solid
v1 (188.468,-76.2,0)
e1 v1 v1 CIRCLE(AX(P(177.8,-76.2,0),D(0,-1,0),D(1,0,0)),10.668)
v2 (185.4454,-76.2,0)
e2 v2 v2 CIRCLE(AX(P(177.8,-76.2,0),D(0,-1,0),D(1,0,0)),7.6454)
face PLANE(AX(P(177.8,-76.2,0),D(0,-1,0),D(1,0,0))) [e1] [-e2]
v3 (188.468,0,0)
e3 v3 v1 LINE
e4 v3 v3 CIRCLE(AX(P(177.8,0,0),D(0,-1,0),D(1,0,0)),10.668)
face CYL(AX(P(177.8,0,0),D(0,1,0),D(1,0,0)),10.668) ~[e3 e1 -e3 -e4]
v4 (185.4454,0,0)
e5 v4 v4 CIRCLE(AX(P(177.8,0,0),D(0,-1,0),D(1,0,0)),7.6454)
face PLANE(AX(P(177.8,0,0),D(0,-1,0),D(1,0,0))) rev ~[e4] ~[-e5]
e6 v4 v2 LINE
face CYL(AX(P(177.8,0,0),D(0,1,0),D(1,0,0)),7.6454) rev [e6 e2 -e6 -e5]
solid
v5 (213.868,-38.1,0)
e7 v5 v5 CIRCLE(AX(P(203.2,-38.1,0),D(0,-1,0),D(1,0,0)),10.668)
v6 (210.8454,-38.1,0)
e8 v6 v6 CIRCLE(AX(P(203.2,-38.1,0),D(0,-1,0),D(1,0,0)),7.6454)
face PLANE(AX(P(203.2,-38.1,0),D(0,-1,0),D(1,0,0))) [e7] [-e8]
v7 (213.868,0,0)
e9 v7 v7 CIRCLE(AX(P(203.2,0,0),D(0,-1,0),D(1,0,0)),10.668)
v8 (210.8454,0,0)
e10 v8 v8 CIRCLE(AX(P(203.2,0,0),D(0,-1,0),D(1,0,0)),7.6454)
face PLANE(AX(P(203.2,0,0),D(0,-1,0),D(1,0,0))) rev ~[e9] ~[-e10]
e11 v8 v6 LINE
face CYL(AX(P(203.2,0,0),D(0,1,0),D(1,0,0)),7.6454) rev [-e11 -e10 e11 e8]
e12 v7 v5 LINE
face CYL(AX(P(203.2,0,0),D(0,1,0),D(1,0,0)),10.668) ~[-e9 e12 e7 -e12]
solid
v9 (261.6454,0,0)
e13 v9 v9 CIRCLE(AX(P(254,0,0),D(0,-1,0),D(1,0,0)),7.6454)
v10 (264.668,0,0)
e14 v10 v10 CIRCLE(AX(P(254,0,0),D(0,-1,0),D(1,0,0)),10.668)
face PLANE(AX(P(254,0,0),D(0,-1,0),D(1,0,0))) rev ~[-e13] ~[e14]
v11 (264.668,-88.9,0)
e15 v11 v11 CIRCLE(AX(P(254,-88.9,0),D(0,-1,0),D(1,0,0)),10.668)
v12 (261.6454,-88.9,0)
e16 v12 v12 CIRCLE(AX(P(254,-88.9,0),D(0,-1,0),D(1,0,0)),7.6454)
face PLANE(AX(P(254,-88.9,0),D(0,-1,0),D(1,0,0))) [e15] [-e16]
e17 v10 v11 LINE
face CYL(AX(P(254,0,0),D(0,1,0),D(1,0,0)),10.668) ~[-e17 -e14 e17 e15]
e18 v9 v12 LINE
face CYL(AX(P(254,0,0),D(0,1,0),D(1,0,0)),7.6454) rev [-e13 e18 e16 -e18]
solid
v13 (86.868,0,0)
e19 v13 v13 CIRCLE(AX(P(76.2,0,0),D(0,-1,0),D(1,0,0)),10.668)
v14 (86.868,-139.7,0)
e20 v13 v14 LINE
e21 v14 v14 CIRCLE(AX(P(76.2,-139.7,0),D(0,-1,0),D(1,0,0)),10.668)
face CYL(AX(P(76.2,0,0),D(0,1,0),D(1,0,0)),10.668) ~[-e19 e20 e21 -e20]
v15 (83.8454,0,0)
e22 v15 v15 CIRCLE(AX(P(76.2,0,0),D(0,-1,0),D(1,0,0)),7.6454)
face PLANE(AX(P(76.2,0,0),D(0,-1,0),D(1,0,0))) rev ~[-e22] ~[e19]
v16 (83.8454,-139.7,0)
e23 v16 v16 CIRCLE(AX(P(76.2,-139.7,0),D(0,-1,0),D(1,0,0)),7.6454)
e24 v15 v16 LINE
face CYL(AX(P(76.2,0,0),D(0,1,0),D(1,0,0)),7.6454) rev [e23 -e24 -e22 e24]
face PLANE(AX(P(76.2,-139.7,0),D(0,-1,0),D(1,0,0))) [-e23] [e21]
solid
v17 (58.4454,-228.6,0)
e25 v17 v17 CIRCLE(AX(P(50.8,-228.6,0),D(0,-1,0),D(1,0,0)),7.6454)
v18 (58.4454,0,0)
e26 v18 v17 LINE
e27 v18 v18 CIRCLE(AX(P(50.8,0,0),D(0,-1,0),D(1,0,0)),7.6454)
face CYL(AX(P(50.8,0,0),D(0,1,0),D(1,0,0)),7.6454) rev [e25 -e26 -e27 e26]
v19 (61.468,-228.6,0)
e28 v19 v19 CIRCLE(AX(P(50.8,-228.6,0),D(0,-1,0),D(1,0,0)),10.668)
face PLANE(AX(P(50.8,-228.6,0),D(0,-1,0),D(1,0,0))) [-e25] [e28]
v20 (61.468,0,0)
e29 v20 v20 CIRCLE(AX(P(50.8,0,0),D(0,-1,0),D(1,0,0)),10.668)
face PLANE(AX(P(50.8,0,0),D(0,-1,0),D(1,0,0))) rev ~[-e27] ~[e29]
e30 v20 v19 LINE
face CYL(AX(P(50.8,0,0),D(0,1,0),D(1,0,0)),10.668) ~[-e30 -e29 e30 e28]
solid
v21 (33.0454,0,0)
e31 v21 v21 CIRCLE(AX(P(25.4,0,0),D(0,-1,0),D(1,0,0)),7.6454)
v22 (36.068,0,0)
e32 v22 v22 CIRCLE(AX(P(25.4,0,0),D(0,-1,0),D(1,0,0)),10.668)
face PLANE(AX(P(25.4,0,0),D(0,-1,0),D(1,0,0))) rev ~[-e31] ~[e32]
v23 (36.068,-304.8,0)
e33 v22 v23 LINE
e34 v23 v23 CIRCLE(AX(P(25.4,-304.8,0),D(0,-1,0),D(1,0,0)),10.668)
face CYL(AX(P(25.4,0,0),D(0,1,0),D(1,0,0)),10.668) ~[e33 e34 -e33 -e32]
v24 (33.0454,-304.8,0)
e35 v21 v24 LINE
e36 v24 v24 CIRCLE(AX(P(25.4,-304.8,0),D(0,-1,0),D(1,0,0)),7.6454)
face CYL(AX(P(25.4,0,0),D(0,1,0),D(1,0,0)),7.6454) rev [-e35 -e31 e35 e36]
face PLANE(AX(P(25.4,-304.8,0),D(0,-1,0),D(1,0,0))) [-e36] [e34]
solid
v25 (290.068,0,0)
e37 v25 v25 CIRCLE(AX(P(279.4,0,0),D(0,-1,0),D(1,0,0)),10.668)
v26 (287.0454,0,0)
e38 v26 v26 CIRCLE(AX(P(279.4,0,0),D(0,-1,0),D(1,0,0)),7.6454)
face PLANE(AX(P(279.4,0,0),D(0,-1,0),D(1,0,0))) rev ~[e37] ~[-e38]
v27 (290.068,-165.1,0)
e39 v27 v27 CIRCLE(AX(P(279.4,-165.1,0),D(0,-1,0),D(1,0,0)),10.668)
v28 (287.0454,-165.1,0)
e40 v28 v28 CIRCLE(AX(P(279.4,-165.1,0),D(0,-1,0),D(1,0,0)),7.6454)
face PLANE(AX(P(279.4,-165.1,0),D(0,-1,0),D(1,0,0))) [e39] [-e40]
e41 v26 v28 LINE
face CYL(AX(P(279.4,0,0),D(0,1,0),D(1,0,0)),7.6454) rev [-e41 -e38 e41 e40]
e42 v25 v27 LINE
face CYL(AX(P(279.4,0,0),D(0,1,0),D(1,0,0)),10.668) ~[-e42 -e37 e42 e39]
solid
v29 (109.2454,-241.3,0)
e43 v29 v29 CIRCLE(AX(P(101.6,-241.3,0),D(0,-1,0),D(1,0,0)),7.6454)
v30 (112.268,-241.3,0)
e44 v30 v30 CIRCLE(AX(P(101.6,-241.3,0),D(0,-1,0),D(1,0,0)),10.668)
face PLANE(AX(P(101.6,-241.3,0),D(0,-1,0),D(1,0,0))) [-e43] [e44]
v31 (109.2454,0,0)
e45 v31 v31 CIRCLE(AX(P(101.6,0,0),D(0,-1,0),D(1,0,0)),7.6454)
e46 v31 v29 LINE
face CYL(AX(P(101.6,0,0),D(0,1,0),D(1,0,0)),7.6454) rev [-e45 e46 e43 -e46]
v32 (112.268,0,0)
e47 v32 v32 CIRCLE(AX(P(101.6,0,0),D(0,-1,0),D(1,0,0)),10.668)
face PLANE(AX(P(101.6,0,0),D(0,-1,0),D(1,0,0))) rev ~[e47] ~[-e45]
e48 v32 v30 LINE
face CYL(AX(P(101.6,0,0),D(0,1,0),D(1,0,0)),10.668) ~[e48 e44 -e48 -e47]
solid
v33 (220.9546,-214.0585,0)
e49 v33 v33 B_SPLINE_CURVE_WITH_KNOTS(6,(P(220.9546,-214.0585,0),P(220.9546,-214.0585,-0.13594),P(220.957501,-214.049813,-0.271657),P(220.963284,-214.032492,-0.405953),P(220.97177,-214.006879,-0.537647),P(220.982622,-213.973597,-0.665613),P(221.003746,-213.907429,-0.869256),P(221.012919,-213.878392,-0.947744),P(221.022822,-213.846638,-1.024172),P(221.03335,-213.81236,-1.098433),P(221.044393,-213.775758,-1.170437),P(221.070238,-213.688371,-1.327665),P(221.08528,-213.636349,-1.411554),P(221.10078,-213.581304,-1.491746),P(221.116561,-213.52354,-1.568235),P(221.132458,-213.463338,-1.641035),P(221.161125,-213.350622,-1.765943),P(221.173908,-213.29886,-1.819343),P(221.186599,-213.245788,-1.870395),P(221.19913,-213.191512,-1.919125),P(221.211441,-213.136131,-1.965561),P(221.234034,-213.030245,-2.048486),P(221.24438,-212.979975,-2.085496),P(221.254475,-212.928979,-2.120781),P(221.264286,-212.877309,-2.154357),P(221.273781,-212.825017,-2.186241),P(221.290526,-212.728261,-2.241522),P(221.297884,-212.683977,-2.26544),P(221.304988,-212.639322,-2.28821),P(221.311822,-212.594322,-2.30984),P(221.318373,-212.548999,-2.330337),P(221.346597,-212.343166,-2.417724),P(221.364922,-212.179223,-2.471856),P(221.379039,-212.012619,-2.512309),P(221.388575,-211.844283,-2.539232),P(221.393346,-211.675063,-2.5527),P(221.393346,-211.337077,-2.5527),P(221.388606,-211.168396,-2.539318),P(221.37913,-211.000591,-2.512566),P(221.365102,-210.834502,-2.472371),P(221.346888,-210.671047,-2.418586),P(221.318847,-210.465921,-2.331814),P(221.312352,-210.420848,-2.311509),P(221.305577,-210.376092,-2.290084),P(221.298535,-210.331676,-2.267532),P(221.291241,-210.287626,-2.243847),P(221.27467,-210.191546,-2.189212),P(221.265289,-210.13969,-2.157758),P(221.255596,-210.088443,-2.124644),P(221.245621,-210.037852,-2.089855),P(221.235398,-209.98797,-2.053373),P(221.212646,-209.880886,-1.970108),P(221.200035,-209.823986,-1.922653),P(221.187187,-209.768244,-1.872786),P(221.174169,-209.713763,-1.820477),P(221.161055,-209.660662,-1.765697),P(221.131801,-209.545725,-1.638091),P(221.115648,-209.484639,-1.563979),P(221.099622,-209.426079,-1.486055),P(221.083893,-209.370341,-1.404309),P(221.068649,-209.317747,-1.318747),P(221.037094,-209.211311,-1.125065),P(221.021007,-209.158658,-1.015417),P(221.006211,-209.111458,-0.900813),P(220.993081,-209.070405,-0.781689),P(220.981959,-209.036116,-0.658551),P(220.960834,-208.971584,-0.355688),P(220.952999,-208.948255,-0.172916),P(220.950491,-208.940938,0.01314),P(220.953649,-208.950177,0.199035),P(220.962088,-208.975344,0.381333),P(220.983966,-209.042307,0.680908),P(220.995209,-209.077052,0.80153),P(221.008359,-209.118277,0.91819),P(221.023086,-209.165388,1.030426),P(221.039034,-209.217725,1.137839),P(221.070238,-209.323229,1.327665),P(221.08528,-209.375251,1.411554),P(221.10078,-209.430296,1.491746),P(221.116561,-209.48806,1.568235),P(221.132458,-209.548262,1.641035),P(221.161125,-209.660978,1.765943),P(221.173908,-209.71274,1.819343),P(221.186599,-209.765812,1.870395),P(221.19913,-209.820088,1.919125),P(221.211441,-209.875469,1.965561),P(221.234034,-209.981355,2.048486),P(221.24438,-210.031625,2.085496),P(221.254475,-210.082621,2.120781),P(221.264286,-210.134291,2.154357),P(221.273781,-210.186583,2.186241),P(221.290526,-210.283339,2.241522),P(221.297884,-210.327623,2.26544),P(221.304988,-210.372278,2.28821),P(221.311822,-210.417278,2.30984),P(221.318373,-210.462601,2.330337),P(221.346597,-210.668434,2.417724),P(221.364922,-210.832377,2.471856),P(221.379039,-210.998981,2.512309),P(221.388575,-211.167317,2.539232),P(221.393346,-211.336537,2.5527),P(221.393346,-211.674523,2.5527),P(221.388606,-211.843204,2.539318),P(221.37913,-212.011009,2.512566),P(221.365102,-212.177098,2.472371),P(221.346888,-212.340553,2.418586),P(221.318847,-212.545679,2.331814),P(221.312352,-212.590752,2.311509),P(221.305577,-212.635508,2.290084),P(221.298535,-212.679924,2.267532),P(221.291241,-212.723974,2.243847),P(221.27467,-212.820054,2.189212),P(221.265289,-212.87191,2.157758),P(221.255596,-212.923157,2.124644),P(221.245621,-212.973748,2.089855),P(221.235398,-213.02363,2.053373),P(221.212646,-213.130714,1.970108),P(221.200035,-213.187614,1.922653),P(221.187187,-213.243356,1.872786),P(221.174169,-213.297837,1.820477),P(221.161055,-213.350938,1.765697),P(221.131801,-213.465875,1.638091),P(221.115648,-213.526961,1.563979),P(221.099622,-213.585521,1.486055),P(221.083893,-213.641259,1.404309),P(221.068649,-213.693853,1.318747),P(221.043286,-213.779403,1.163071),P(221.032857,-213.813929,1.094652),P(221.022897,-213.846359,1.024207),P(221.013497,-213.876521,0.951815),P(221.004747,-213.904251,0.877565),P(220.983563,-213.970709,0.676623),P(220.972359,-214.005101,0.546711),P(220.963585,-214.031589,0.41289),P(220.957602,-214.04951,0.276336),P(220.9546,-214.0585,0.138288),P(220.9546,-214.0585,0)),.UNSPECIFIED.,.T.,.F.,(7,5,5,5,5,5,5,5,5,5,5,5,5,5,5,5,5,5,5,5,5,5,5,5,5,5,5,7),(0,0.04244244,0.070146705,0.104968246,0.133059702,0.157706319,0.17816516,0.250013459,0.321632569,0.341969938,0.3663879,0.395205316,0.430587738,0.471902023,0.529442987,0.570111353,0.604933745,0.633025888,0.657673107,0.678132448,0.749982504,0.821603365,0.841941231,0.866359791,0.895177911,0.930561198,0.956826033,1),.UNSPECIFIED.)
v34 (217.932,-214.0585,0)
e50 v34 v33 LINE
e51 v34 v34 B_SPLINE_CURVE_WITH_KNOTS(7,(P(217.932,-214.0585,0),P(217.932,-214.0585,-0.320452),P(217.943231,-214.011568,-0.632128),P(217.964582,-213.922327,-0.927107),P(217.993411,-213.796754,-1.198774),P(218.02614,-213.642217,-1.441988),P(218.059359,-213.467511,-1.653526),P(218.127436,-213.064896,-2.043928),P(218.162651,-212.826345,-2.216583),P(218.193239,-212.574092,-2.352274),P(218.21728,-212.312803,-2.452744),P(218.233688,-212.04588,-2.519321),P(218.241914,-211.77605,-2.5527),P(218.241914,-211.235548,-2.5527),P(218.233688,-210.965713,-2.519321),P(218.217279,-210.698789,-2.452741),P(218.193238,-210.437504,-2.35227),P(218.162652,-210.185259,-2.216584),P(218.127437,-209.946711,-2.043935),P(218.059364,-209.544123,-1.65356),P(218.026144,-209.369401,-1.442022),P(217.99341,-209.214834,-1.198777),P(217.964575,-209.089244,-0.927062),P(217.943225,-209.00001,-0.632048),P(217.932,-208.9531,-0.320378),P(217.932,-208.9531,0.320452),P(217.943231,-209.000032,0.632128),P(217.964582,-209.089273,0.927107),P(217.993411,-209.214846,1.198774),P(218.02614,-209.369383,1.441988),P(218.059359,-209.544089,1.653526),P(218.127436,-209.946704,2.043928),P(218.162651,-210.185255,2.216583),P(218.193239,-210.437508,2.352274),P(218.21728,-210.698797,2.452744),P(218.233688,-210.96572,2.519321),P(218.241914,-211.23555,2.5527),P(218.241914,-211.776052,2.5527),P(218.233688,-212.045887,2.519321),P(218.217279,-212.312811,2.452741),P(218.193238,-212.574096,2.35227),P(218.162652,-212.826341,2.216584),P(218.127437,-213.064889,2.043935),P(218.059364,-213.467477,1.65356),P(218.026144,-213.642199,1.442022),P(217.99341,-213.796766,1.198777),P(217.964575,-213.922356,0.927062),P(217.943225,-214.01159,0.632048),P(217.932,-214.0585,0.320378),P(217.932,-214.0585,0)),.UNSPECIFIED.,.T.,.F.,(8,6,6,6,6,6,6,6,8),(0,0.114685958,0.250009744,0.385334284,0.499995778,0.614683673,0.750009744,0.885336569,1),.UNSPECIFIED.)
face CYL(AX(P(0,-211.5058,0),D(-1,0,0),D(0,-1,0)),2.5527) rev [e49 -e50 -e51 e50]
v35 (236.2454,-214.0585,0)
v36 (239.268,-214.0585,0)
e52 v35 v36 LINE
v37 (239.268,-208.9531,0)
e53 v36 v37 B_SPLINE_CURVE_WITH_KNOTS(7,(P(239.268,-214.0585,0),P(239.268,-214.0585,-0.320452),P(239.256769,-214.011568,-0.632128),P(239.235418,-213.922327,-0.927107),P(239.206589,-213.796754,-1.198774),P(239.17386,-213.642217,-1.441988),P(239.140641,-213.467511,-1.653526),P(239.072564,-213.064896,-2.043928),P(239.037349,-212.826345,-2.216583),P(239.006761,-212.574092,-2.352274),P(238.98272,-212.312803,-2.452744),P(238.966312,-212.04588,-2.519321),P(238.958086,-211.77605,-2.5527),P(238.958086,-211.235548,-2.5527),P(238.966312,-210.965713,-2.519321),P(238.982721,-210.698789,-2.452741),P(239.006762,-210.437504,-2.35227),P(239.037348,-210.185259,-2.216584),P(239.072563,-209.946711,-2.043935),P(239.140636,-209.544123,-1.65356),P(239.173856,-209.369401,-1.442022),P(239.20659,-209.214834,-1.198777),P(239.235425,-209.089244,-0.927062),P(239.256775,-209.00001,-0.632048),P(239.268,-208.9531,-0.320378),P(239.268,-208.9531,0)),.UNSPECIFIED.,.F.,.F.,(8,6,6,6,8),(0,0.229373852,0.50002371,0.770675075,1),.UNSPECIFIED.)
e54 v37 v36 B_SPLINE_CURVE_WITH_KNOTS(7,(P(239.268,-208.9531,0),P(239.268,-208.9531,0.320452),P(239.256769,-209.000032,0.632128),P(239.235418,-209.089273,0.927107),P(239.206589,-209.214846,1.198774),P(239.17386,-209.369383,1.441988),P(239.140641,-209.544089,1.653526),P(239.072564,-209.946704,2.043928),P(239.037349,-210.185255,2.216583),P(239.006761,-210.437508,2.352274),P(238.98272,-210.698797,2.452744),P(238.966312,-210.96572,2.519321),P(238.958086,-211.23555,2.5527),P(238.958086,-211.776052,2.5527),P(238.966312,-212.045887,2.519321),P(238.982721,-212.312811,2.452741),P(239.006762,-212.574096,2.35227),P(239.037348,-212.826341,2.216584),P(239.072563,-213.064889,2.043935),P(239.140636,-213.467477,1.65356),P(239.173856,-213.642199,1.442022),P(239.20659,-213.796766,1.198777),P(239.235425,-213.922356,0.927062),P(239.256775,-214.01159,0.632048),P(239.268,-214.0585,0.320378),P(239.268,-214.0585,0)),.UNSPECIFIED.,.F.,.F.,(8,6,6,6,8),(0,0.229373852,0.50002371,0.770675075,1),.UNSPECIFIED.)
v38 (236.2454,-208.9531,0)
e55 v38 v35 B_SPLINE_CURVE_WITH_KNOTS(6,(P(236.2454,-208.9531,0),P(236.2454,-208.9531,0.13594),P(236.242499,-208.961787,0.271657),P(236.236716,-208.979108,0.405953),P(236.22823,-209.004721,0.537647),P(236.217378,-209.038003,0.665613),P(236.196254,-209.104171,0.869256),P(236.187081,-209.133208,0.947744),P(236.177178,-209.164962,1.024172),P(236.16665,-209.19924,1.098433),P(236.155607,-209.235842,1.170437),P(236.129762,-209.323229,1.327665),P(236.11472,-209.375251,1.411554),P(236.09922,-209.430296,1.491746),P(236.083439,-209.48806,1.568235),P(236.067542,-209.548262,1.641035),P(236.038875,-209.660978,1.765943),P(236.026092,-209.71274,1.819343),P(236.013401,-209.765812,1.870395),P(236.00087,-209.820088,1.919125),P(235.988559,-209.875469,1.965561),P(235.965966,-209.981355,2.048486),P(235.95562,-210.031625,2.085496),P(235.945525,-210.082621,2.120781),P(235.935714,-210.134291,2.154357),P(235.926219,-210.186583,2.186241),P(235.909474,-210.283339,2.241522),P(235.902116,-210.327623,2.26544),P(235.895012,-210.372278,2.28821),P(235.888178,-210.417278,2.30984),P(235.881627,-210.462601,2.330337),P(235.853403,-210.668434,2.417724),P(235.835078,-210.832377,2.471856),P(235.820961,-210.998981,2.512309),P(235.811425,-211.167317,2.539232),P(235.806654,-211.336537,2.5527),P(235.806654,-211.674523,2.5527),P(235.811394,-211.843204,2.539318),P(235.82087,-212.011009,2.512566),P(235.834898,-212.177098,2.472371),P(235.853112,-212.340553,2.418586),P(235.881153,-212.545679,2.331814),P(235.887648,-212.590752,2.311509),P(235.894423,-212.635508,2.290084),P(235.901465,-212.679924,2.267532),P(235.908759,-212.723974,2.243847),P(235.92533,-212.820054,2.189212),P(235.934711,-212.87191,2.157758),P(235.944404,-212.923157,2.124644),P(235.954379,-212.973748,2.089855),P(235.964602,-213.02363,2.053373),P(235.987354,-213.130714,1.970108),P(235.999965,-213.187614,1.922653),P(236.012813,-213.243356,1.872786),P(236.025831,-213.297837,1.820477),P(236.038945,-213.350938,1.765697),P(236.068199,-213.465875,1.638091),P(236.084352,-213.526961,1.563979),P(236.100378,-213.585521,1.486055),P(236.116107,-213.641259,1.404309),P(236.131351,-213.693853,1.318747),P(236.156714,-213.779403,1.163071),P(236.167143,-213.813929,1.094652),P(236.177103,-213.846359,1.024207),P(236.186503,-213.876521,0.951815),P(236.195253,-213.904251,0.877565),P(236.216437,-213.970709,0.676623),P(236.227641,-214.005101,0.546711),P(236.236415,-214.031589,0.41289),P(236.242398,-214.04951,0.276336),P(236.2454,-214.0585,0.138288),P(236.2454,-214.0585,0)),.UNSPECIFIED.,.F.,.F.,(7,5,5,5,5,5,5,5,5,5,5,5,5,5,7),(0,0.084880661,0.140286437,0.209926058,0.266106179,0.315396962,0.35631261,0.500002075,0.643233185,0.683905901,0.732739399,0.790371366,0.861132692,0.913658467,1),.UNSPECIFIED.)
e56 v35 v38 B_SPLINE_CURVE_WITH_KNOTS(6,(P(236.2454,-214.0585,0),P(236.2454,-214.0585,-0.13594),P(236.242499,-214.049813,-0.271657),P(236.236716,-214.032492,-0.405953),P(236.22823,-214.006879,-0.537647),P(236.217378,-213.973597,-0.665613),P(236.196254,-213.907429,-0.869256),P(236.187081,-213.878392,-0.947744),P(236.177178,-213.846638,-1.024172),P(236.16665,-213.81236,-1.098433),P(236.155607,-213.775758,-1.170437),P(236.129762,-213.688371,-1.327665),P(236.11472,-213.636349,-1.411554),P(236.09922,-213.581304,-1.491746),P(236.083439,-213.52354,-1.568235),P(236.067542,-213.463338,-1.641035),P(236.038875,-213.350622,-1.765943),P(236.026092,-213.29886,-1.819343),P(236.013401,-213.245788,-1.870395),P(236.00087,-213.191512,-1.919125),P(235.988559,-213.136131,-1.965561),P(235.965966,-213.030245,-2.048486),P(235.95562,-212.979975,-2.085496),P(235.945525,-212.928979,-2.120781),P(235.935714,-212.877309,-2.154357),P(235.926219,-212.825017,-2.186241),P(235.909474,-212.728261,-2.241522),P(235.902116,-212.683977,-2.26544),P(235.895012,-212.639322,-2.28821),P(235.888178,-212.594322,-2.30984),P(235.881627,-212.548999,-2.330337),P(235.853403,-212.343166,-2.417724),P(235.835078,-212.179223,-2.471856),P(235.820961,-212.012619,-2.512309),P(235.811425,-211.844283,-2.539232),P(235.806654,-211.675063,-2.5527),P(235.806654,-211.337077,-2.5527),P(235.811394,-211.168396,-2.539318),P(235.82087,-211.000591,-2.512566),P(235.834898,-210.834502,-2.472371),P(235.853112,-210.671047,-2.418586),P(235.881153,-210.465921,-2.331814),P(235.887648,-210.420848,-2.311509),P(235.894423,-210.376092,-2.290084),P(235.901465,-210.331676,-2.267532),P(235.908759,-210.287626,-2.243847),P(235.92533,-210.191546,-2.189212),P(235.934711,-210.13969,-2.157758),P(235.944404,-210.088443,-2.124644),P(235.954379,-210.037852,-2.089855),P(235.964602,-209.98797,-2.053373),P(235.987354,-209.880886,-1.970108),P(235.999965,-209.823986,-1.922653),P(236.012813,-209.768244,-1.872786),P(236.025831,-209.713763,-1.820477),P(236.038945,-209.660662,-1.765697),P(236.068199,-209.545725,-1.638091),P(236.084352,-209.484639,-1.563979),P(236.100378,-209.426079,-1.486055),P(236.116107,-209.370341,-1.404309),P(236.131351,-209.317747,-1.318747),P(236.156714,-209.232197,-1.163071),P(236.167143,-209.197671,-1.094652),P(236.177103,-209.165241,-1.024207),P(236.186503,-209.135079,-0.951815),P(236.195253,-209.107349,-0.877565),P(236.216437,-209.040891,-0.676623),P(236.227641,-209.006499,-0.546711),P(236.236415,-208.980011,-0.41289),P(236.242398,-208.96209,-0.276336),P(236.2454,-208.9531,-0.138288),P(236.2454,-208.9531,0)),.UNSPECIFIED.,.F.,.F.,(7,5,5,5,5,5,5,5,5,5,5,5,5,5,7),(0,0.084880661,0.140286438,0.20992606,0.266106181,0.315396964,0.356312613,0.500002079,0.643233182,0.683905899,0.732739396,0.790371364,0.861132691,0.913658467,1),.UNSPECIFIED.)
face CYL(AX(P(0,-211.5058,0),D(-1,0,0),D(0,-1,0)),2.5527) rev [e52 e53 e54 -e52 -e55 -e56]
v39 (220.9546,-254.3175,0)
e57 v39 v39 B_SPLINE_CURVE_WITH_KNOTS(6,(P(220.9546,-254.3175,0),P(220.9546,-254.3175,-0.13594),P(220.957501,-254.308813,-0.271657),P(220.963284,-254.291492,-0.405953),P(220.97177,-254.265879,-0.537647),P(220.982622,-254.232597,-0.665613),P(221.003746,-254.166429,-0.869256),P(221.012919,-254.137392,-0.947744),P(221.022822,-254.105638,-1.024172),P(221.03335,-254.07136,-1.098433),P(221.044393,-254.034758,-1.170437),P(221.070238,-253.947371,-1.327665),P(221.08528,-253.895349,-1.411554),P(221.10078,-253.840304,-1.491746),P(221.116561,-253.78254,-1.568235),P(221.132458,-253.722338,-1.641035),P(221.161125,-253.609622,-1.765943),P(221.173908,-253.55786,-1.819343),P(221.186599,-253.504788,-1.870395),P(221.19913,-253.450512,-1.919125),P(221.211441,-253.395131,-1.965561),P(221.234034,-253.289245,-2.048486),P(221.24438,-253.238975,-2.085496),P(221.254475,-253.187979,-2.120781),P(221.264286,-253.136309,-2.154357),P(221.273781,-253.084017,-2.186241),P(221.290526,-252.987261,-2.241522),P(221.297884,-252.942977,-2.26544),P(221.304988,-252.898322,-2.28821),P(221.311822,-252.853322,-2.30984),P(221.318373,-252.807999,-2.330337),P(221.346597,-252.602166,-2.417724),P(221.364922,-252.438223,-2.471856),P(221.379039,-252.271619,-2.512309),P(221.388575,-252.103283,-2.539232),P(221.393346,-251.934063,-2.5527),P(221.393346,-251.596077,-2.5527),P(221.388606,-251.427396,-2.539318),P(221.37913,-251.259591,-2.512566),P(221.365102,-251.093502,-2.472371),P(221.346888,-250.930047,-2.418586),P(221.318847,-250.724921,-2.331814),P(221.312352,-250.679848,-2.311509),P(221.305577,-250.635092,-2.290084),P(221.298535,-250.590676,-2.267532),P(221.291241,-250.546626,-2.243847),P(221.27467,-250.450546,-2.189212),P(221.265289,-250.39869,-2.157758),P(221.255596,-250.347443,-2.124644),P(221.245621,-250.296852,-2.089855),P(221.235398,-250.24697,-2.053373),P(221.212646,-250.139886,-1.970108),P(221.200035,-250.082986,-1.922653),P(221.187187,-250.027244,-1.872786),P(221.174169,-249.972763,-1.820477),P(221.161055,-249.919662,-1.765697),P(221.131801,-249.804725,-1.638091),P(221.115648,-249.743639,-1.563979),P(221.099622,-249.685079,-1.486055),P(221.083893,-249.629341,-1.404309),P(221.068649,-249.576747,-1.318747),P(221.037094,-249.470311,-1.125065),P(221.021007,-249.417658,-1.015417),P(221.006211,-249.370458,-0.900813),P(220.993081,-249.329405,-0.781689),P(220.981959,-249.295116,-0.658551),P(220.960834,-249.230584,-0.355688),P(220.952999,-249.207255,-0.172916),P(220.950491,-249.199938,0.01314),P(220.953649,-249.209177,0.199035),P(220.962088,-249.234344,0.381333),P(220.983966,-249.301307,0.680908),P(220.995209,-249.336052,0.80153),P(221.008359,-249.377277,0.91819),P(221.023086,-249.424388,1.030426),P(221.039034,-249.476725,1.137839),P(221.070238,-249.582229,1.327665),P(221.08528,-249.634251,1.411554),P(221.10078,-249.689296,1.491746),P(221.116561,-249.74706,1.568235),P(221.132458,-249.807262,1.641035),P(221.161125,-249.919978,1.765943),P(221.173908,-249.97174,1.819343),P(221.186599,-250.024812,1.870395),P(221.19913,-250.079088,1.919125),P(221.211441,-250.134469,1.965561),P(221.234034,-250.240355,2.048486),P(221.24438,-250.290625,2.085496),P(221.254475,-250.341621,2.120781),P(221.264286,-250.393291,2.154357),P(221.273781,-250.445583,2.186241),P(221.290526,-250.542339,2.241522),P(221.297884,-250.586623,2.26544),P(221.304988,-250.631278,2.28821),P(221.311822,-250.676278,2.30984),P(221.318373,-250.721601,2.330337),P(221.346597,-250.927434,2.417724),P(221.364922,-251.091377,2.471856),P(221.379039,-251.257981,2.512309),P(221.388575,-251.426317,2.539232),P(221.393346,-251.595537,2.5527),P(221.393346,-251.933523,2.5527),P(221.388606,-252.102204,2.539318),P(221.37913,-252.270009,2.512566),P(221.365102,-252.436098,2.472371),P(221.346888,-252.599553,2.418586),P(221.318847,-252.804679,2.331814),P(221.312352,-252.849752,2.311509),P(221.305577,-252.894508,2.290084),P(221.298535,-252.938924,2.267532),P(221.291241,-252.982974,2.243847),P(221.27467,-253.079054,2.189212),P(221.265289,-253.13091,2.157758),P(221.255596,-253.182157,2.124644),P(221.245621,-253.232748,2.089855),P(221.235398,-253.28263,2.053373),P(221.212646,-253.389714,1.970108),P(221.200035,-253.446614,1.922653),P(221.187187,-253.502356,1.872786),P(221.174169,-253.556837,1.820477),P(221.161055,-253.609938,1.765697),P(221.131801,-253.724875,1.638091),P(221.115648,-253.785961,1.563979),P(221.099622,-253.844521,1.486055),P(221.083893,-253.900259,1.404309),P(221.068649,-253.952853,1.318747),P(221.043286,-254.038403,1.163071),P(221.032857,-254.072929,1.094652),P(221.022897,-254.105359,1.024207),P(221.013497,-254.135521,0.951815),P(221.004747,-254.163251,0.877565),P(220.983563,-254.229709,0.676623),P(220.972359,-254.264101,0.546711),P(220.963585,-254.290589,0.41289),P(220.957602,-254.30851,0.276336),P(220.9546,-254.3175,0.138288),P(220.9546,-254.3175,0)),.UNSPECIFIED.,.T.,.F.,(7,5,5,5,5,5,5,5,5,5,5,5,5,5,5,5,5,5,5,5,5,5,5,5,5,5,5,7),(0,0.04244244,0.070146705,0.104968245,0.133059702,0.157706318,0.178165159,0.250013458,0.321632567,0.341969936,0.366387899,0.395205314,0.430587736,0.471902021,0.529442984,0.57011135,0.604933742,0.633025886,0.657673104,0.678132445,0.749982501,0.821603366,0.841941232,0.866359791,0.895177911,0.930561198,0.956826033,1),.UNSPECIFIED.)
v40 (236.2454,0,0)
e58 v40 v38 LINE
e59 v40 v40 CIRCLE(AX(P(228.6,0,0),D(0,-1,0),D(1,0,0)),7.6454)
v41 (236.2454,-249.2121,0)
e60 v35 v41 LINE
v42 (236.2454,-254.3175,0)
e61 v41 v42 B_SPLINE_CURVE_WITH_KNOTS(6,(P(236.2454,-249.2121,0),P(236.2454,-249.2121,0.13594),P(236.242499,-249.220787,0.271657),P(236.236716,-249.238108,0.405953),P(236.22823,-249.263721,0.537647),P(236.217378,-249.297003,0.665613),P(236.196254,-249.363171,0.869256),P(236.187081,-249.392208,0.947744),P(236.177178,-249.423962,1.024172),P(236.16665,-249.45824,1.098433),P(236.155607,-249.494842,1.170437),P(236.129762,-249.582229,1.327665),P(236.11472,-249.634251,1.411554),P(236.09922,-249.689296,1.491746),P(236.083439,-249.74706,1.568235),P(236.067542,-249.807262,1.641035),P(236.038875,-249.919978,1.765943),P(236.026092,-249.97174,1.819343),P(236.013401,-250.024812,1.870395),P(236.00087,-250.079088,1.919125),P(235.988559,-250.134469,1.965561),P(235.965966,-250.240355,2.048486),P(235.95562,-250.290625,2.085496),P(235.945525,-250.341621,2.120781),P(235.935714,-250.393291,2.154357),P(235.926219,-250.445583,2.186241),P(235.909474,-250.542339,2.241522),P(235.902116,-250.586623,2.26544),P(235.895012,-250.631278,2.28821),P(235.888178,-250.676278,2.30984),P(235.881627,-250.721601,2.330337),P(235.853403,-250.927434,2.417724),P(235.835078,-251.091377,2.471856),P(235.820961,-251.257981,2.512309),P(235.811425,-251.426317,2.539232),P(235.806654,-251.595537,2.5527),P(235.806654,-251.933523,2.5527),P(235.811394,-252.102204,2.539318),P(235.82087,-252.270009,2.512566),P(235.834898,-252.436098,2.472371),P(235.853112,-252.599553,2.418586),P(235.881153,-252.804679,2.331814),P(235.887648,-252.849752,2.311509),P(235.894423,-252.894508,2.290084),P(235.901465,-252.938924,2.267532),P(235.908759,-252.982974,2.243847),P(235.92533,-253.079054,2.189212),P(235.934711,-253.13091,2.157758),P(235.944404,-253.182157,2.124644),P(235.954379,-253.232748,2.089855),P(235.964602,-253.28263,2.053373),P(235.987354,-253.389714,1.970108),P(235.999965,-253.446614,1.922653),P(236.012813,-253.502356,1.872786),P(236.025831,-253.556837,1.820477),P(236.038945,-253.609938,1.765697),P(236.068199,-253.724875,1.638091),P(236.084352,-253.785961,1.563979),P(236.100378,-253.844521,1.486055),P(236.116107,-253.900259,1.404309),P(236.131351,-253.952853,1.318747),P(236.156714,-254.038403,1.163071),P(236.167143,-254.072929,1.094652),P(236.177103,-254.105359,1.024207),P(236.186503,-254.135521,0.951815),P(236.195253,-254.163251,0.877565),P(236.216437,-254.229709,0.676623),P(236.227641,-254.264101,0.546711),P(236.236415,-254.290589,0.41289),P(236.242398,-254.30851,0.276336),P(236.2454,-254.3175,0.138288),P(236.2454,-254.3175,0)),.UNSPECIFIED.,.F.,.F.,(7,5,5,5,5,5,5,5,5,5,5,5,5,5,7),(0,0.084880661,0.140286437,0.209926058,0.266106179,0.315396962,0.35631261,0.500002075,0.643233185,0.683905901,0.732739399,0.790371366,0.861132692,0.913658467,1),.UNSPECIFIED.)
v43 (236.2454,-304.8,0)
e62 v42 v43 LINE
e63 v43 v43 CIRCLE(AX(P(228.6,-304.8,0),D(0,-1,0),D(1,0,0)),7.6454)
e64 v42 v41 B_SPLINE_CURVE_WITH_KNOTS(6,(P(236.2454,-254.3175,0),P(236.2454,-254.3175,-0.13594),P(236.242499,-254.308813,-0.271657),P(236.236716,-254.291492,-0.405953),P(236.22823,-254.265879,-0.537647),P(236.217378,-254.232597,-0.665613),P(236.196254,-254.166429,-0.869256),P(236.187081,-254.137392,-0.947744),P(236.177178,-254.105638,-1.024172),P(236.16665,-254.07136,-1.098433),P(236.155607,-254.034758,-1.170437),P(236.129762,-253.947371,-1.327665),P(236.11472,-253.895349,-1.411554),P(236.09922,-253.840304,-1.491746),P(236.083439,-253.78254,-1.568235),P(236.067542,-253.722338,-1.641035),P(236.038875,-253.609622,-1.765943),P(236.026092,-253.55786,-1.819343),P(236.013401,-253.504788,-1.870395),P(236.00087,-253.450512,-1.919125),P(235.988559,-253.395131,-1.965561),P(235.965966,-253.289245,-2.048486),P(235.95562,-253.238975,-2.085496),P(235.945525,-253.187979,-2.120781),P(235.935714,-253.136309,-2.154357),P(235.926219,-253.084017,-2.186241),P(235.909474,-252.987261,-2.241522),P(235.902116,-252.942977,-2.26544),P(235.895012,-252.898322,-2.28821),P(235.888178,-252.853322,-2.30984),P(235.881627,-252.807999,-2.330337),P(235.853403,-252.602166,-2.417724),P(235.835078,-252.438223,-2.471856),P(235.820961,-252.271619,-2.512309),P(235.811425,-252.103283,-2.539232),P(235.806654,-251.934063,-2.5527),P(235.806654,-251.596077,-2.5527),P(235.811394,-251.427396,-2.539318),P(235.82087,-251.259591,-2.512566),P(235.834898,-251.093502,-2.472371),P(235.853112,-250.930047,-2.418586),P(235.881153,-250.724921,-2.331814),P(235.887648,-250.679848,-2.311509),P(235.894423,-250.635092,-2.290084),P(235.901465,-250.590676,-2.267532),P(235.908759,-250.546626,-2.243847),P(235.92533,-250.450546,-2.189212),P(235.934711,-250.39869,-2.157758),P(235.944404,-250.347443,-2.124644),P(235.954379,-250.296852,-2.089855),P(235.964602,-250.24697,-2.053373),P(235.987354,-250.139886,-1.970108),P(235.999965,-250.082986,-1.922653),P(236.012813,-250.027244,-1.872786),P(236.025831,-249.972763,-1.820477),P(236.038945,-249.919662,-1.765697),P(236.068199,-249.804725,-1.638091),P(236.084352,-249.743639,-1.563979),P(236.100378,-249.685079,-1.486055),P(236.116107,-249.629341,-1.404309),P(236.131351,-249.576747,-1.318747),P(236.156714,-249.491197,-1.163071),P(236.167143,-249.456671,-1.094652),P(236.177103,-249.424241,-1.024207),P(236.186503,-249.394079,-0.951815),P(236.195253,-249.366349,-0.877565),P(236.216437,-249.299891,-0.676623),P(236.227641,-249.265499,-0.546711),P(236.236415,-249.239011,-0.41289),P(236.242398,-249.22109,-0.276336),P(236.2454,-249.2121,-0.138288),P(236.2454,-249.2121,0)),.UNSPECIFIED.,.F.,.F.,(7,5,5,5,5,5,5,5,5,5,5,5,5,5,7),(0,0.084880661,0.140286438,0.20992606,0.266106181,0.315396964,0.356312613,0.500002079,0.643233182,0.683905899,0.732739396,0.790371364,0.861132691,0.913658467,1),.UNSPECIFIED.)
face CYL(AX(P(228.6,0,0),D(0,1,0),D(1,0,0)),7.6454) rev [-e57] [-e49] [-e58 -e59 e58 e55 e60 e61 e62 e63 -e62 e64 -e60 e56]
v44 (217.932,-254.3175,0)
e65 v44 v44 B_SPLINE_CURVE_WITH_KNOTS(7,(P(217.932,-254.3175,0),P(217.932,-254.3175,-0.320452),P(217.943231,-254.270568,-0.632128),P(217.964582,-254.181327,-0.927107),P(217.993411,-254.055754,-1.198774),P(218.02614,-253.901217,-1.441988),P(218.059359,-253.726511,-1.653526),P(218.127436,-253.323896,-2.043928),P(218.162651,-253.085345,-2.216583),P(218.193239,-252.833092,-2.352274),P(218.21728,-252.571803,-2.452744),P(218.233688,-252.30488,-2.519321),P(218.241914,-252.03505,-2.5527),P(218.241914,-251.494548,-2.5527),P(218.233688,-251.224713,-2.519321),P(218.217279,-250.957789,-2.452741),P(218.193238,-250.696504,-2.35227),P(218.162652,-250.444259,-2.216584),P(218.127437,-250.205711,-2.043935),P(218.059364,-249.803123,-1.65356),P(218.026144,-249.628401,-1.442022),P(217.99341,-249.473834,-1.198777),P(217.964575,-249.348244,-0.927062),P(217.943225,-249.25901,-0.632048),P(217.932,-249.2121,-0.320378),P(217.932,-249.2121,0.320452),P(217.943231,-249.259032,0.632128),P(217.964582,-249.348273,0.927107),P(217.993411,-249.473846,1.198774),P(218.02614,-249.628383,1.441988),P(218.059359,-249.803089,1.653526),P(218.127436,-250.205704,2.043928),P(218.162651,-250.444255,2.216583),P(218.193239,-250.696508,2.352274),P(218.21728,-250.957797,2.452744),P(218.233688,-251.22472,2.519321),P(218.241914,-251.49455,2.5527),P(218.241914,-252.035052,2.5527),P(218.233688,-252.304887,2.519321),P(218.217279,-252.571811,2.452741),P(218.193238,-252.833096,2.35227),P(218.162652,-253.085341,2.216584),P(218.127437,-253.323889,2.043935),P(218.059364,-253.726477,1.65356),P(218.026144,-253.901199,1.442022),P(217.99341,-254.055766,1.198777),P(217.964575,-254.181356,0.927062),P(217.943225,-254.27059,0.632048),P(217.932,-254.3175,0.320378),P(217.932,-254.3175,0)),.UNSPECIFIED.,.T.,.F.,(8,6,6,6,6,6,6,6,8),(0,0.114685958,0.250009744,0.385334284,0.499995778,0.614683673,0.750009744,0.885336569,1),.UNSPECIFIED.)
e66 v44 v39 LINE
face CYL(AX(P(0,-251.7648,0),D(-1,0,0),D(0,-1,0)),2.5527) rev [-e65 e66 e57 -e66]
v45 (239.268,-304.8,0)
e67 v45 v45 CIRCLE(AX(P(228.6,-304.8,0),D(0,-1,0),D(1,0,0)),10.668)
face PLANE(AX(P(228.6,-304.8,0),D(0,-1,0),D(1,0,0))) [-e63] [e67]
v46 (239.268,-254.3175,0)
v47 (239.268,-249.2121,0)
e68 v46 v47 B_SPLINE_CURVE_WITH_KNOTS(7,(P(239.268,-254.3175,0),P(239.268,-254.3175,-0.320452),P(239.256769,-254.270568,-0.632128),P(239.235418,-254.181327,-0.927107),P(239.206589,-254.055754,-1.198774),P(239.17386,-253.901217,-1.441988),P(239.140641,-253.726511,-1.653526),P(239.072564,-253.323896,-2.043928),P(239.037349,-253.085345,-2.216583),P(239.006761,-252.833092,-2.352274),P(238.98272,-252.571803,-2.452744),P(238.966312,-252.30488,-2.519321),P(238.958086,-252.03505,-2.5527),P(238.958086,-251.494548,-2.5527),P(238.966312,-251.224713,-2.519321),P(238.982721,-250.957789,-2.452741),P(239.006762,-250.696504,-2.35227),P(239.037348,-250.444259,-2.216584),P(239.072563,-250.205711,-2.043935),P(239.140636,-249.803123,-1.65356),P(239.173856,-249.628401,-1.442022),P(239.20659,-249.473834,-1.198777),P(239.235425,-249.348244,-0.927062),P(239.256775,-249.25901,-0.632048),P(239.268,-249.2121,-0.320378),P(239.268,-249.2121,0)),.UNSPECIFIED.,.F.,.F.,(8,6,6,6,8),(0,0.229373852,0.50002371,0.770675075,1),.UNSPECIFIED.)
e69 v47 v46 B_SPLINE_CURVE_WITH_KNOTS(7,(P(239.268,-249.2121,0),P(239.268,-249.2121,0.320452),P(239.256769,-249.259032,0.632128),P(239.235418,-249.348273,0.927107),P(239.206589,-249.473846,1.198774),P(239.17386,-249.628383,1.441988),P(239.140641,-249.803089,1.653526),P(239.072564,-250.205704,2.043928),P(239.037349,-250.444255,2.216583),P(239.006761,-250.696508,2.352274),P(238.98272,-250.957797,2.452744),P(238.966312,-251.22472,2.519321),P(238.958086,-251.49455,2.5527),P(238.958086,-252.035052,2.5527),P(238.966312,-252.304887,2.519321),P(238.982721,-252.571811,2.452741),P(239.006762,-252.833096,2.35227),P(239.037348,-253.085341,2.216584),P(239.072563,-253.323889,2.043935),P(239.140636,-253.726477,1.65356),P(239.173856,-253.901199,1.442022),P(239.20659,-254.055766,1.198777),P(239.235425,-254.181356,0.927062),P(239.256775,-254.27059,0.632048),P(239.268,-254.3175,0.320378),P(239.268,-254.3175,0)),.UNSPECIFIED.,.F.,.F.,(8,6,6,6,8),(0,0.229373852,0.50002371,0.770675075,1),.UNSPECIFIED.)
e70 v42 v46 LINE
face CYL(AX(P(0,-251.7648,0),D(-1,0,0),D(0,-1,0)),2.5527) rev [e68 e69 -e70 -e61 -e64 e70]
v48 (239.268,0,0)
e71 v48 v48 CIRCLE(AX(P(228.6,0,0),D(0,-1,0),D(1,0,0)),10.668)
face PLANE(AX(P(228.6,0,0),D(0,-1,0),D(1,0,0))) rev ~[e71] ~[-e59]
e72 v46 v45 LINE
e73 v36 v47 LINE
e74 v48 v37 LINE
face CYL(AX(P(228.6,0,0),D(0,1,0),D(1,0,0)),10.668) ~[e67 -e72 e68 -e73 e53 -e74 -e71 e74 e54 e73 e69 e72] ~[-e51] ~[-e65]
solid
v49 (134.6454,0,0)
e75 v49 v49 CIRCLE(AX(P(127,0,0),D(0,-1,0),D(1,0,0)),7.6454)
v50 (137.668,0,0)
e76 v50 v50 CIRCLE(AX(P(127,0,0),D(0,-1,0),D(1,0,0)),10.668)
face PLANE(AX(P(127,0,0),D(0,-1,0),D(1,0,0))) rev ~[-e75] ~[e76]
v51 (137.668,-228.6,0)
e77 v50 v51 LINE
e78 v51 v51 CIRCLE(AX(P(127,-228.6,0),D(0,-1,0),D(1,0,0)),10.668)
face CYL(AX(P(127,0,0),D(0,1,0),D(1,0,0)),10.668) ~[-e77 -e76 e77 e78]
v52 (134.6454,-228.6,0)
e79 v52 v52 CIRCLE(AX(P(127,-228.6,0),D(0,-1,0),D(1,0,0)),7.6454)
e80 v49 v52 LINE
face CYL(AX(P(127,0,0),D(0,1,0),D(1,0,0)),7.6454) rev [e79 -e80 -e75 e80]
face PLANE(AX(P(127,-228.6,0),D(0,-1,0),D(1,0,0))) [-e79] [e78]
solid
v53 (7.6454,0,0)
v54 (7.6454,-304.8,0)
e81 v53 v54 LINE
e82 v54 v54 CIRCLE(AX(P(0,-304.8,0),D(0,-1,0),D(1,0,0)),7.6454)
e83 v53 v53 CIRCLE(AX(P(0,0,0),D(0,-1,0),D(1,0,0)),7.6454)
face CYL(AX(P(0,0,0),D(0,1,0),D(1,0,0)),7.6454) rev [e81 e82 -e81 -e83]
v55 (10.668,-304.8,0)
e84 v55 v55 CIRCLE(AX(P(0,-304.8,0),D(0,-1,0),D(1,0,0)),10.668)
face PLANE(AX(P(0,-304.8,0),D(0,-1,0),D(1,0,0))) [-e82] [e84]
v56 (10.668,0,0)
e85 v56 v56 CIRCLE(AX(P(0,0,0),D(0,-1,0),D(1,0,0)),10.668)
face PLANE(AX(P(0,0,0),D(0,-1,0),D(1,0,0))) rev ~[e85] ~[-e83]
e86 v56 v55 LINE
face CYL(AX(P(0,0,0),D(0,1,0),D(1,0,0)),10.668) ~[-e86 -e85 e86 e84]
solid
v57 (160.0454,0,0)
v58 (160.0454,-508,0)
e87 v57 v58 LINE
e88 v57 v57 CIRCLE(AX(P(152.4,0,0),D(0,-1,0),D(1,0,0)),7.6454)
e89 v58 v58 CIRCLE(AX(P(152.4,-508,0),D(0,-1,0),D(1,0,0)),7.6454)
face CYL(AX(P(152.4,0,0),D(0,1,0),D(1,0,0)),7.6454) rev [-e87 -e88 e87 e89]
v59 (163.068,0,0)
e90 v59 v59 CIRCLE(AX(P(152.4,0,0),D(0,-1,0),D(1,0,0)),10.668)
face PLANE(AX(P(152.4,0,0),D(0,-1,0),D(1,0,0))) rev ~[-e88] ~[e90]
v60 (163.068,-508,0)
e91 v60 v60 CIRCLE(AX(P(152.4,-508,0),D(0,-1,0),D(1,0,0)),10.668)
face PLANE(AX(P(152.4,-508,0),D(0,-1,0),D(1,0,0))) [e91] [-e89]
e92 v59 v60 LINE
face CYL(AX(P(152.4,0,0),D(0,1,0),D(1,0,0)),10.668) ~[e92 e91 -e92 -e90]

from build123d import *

# Parameters (mm, degrees)
F0_R      = 10.668
F0_R_2    = 7.6454
F1_DEPTH  = 304.8
F2_DEPTH  = 304.8
F3_DEPTH  = 228.6
F4_DEPTH  = 139.7
F5_DEPTH  = 241.3
F6_DEPTH  = 228.6
F7_DEPTH  = 508
F8_DEPTH  = 76.2
F9_DEPTH  = 38.1
F11_DEPTH = 304.8
F12_DEPTH = 88.9
F13_DEPTH = 165.1


with BuildPart() as f1:
    # F0 (on Front) → F1 (new body)
    with BuildSketch(Plane.XZ):
        Circle(F0_R)
        Circle(F0_R_2, mode=Mode.SUBTRACT)
    extrude(amount=F1_DEPTH)


with BuildPart() as f1b:
    # F0 (on Front) → F1, piece 2 (new body)
    with BuildSketch(Plane.XZ):
        with Locations((228.6, 0)):
            Circle(F0_R)
        with Locations((228.6, 0)):
            Circle(F0_R_2, mode=Mode.SUBTRACT)
    extrude(amount=F1_DEPTH)

    # F10 (on Right) → F11 (cut)
    with BuildSketch(Plane.YZ):
        with BuildLine():
            ThreePointArc((-249.2121, 0), (-251.7648, 2.5527), (-254.3175, 0))
            Line((-254.3175, 0), (-249.2121, 0))
        make_face()
        with BuildLine():
            ThreePointArc((-208.9531, 0), (-211.5058, 2.5527), (-214.0585, 0))
            Line((-214.0585, 0), (-208.9531, 0))
        make_face()
        with BuildLine():
            Line((-208.9531, 0), (-214.0585, 0))
            ThreePointArc((-214.0585, 0), (-211.5058, -2.5527), (-208.9531, 0))
        make_face()
        with BuildLine():
            Line((-249.2121, 0), (-254.3175, 0))
            ThreePointArc((-254.3175, 0), (-251.7648, -2.5527), (-249.2121, 0))
        make_face()
    extrude(amount=F11_DEPTH, mode=Mode.SUBTRACT)


with BuildPart() as f2:
    # F0 (on Front) → F2 (new body)
    with BuildSketch(Plane.XZ):
        with Locations((25.4, 0)):
            Circle(F0_R)
        with Locations((25.4, 0)):
            Circle(F0_R_2, mode=Mode.SUBTRACT)
    extrude(amount=F2_DEPTH)


with BuildPart() as f3:
    # F0 (on Front) → F3 (new body)
    with BuildSketch(Plane.XZ):
        with Locations((50.8, 0)):
            Circle(F0_R)
        with Locations((50.8, 0)):
            Circle(F0_R_2, mode=Mode.SUBTRACT)
    extrude(amount=F3_DEPTH)


with BuildPart() as f4:
    # F0 (on Front) → F4 (new body)
    with BuildSketch(Plane.XZ):
        with Locations((76.2, 0)):
            Circle(F0_R)
        with Locations((76.2, 0)):
            Circle(F0_R_2, mode=Mode.SUBTRACT)
    extrude(amount=F4_DEPTH)


with BuildPart() as f5:
    # F0 (on Front) → F5 (new body)
    with BuildSketch(Plane.XZ):
        with Locations((101.6, 0)):
            Circle(F0_R)
        with Locations((101.6, 0)):
            Circle(F0_R_2, mode=Mode.SUBTRACT)
    extrude(amount=F5_DEPTH)


with BuildPart() as f6:
    # F0 (on Front) → F6 (new body)
    with BuildSketch(Plane.XZ):
        with Locations((127, 0)):
            Circle(F0_R)
        with Locations((127, 0)):
            Circle(F0_R_2, mode=Mode.SUBTRACT)
    extrude(amount=F6_DEPTH)


with BuildPart() as f7:
    # F0 (on Front) → F7 (new body)
    with BuildSketch(Plane.XZ):
        with Locations((152.4, 0)):
            Circle(F0_R)
        with Locations((152.4, 0)):
            Circle(F0_R_2, mode=Mode.SUBTRACT)
    extrude(amount=F7_DEPTH)


with BuildPart() as f8:
    # F0 (on Front) → F8 (new body)
    with BuildSketch(Plane.XZ):
        with Locations((177.8, 0)):
            Circle(F0_R)
        with Locations((177.8, 0)):
            Circle(F0_R_2, mode=Mode.SUBTRACT)
    extrude(amount=F8_DEPTH)


with BuildPart() as f9:
    # F0 (on Front) → F9 (new body)
    with BuildSketch(Plane.XZ):
        with Locations((203.2, 0)):
            Circle(F0_R)
        with Locations((203.2, 0)):
            Circle(F0_R_2, mode=Mode.SUBTRACT)
    extrude(amount=F9_DEPTH)


with BuildPart() as f12:
    # F0 (on Front) → F12 (new body)
    with BuildSketch(Plane.XZ):
        with Locations((254, 0)):
            Circle(F0_R)
        with Locations((254, 0)):
            Circle(F0_R_2, mode=Mode.SUBTRACT)
    extrude(amount=F12_DEPTH)


with BuildPart() as f13:
    # F0 (on Front) → F13 (new body)
    with BuildSketch(Plane.XZ):
        with Locations((279.4, 0)):
            Circle(F0_R)
        with Locations((279.4, 0)):
            Circle(F0_R_2, mode=Mode.SUBTRACT)
    extrude(amount=F13_DEPTH)


solid = Compound([f1.part, f1b.part, f2.part, f3.part, f4.part, f5.part, f6.part, f7.part, f8.part, f9.part, f12.part, f13.part])
